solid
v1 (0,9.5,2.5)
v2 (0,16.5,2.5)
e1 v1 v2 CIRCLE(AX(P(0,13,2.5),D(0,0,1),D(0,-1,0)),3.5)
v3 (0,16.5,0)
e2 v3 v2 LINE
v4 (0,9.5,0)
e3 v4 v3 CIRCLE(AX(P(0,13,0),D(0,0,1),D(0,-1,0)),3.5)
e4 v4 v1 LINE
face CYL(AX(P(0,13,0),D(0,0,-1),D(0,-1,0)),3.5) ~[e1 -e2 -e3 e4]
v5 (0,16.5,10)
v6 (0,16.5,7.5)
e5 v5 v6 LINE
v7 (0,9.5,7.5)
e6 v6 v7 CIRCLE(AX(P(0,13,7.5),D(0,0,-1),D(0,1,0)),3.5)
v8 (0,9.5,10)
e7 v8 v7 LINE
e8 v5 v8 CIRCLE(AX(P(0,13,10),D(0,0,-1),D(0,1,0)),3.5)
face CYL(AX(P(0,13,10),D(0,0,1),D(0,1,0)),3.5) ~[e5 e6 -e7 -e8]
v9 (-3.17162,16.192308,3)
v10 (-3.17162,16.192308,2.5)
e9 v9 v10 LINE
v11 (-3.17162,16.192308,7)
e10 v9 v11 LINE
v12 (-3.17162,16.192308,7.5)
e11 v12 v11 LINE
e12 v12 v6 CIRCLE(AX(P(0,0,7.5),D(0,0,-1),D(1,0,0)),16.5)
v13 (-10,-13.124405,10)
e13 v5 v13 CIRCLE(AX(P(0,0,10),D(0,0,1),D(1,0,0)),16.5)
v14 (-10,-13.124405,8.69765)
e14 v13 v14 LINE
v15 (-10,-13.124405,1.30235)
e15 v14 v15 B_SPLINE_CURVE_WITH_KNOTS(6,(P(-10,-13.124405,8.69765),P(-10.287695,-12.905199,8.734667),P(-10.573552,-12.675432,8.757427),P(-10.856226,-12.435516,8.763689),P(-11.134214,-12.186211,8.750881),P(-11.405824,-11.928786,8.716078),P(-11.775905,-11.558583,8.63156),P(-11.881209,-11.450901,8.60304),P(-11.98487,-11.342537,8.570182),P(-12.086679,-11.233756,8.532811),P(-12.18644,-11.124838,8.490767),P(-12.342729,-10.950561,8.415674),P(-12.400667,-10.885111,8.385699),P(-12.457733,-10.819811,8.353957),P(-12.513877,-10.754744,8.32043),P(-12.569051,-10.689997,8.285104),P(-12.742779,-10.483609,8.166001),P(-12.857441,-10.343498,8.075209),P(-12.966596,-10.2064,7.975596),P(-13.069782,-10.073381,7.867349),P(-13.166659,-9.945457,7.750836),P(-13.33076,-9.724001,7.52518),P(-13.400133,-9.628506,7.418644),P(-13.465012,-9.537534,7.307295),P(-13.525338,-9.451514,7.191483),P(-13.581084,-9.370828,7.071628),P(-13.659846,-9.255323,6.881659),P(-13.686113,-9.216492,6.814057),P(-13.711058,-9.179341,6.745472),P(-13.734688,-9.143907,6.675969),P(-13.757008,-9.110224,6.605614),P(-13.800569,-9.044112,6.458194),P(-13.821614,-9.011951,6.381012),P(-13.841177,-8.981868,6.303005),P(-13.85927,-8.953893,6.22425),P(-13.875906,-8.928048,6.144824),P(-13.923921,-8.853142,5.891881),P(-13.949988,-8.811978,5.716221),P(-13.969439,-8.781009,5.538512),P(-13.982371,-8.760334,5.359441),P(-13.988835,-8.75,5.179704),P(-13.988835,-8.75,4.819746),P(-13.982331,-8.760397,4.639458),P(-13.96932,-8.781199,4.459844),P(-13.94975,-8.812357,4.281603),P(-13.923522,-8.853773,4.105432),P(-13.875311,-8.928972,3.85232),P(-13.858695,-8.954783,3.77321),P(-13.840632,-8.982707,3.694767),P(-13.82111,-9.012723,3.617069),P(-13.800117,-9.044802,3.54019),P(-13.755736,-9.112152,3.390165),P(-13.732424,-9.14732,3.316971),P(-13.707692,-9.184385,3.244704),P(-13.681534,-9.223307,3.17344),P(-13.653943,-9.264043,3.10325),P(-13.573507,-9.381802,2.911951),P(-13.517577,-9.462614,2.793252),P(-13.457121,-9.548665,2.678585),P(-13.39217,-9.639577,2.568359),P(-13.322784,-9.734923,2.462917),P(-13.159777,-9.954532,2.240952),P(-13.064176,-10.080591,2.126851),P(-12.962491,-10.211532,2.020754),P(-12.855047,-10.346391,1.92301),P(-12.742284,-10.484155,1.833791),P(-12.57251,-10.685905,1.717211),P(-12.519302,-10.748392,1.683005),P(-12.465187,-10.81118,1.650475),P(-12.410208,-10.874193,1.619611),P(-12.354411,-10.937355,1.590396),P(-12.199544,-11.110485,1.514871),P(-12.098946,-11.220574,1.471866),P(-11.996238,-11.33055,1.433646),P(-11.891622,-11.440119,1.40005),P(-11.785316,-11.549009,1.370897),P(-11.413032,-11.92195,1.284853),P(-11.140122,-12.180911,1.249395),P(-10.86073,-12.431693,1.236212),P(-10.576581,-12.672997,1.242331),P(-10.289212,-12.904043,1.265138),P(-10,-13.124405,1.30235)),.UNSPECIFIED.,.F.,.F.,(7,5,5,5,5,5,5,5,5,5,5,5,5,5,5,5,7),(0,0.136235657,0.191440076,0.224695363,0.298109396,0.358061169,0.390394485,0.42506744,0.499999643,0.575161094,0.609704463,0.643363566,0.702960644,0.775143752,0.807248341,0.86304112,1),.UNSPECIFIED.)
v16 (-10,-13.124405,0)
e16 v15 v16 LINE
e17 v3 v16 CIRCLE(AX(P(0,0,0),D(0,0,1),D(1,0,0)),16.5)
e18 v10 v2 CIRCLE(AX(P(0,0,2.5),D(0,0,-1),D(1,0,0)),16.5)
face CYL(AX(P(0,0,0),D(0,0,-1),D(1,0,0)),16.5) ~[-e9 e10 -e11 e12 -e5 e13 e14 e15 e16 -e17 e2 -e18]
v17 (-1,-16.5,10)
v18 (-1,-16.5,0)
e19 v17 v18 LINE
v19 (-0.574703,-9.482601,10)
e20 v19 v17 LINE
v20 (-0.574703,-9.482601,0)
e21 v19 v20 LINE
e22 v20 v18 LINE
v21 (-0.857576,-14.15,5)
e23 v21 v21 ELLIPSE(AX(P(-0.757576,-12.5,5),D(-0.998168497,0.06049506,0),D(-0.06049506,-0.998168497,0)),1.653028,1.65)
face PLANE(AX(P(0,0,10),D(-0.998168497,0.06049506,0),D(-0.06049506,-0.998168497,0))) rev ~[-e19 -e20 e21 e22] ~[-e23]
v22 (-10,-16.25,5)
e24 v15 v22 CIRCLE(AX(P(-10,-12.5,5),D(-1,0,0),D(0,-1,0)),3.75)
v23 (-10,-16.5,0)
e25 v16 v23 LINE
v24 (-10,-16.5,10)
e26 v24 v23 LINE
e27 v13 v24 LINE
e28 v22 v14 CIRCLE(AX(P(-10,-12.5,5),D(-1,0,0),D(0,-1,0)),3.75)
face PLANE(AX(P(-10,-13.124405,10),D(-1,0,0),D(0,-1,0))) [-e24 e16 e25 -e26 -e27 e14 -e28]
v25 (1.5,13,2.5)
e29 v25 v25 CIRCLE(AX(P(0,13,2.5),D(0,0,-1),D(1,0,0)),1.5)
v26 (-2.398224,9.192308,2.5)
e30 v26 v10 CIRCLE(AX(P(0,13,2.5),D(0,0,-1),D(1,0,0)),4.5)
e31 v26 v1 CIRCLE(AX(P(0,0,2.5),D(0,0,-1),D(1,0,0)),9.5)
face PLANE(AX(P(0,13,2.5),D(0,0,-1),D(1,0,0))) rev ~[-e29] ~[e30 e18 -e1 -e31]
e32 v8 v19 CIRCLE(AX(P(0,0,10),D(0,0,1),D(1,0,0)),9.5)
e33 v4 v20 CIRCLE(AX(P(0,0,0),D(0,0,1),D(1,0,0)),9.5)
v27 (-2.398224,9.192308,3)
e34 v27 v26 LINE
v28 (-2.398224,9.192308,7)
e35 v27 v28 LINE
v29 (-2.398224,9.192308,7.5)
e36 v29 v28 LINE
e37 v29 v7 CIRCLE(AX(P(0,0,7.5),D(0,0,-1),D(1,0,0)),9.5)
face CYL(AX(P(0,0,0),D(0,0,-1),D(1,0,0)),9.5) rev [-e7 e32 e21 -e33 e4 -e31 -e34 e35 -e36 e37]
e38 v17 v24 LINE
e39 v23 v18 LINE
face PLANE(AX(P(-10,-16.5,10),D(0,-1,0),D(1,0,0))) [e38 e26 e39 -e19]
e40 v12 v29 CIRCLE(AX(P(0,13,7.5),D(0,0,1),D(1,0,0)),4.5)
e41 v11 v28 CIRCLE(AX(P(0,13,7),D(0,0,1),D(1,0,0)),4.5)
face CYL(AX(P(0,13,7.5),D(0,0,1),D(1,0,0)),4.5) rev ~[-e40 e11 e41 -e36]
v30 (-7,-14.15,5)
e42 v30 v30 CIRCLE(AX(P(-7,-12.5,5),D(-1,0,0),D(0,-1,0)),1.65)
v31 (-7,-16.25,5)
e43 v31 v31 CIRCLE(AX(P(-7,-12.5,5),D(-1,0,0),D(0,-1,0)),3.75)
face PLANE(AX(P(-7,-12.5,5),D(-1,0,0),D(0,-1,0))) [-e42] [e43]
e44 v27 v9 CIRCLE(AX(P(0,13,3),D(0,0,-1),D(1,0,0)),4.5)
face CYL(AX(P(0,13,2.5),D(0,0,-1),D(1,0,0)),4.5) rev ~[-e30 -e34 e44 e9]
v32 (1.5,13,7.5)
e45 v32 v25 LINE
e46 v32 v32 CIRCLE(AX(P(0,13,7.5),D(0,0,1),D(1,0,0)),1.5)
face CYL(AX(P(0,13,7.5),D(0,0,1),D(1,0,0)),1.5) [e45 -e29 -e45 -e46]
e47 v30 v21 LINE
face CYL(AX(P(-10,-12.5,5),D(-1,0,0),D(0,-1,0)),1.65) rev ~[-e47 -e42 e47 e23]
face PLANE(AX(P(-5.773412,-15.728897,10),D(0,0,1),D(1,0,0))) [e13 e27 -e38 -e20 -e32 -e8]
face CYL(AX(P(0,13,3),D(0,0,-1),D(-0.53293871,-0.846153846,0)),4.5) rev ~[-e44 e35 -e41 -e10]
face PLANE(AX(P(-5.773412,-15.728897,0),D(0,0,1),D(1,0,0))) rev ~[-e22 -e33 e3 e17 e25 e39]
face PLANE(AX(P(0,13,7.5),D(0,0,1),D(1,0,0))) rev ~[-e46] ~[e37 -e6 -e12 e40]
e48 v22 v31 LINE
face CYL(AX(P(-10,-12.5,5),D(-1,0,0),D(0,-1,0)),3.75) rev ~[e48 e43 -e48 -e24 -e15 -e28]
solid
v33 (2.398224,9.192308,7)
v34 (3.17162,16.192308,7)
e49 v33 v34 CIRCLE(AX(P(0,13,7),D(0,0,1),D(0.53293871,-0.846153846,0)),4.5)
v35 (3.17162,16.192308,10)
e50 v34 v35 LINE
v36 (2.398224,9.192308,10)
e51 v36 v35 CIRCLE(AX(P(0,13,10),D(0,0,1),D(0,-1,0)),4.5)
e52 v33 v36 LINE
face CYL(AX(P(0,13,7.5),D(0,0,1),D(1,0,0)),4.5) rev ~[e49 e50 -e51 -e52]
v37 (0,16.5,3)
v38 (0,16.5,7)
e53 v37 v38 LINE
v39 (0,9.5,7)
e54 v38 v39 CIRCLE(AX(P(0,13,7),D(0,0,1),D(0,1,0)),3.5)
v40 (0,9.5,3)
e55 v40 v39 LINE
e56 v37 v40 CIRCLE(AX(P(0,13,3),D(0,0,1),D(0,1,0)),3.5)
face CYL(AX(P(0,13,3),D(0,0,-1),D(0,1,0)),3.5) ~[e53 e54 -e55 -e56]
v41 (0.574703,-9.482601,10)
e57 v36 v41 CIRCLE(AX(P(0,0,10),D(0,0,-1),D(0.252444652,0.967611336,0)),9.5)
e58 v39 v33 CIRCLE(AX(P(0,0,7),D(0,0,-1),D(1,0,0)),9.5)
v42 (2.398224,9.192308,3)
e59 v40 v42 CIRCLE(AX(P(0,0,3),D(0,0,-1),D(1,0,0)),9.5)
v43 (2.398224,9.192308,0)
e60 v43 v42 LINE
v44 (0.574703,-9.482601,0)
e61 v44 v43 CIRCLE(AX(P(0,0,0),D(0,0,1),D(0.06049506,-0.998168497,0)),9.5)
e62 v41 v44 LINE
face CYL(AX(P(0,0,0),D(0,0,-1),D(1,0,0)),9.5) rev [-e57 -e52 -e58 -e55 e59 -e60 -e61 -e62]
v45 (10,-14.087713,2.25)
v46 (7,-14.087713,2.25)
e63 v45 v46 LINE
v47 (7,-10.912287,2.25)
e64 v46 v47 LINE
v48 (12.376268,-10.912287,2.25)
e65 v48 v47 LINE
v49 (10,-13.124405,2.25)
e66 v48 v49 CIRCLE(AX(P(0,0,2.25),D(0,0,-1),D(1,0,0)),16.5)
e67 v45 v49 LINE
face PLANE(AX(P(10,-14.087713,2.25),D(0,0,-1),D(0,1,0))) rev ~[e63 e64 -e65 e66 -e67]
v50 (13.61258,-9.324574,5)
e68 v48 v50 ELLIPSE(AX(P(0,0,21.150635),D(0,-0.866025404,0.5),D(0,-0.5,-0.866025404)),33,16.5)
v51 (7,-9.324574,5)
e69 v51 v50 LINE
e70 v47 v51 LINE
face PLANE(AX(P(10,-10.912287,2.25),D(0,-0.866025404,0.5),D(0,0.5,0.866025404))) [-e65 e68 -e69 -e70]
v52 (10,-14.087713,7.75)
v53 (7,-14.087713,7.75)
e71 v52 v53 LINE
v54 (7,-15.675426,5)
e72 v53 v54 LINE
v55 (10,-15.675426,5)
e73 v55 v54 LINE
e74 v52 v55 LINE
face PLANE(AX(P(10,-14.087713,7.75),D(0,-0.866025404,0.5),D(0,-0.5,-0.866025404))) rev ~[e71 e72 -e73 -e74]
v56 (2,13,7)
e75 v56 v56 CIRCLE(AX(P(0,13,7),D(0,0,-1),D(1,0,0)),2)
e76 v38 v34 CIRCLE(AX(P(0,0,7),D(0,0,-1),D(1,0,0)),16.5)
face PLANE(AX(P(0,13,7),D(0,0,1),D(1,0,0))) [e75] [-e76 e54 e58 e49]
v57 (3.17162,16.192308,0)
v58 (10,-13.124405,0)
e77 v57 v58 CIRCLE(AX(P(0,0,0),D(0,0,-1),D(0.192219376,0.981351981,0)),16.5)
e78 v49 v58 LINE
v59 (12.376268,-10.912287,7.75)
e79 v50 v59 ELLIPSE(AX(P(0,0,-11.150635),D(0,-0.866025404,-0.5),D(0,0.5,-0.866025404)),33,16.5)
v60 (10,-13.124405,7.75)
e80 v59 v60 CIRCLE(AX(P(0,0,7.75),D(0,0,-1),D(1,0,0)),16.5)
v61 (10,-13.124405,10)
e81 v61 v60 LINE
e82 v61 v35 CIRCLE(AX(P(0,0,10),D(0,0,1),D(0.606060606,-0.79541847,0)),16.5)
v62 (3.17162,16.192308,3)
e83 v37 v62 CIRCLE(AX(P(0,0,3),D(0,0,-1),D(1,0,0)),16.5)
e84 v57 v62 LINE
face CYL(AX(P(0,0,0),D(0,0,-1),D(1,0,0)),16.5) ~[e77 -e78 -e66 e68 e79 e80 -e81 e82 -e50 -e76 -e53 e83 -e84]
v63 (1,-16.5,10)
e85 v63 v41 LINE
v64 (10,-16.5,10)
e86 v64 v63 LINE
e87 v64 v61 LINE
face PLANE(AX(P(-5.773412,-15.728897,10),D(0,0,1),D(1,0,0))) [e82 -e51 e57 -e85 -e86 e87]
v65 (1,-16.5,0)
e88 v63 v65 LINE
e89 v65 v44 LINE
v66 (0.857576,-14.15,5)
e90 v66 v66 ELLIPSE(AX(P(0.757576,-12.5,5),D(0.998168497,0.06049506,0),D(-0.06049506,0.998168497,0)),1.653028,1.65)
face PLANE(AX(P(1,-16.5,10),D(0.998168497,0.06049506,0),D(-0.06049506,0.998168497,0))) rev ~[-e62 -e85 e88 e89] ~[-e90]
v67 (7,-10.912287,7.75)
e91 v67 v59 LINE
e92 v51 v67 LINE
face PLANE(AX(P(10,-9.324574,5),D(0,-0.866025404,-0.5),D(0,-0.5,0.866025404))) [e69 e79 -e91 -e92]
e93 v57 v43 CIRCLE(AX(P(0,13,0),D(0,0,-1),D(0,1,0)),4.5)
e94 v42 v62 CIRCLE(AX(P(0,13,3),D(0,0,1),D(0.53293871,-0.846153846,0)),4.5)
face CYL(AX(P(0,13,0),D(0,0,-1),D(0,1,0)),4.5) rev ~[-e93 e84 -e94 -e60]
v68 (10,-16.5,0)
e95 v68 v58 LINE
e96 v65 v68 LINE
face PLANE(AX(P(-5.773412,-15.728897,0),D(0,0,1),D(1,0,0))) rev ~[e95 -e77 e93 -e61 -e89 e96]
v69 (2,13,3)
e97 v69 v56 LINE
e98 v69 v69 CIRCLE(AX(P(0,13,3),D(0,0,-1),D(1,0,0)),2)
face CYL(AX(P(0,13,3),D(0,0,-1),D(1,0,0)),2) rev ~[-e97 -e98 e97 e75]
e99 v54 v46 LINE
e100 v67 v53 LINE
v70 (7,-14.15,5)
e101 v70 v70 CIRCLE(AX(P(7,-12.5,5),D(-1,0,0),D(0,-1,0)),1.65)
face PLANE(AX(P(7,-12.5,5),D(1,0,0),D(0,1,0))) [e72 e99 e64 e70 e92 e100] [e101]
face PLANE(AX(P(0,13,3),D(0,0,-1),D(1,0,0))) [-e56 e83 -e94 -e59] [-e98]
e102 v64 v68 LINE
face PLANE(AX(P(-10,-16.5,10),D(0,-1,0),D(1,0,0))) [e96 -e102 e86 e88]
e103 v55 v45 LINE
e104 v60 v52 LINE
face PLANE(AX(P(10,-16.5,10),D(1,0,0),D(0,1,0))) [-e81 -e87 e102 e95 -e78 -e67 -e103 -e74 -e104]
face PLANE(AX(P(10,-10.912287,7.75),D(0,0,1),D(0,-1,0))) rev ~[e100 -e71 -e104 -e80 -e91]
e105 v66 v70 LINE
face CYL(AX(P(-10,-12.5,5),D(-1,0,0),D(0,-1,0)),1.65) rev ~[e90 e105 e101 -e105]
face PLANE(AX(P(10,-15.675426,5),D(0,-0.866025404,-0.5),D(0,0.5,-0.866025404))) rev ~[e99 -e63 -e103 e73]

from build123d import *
from build123d import SkipClean  # not in build123d's __all__

# Parameters (mm, degrees)
F0_R           = 16.5
F0_R_2         = 9.5
F1_DEPTH       = 10
F3_DEPTH       = 2.5
F4_R           = 4.5
F4_R_2         = 1.5
F5_DEPTH       = 0.5
F7_DEPTH       = 2.5
F8_R           = 4.5
F8_R_2         = 1.5
F9_DEPTH       = 0.5
F10_R          = 2
F10_R_2        = 1.5
F11_DEPTH      = 4
F13_DEPTH      = 10
F15_DEPTH      = 10.001
F16_R          = 1.65
F17_DEPTH      = 20
F19_DEPTH      = 3
F19_DEPTH_BACK = 10
F20_R          = 3.75
F21_DEPTH      = 3
F21_DEPTH_BACK = 25


# Not quite as in the source:
# - after a boolean that leaves OpenCascade's solid faulty, fix() repairs it
# - a feature names something its author has since deleted; it is built from what else it names


with BuildPart() as f1:
    # F0 (on Top) → F1 (new body)
    with BuildSketch(Plane.XY):
        Circle(F0_R)
        Circle(F0_R_2, mode=Mode.SUBTRACT)
    extrude(amount=F1_DEPTH)

    # F2 (on face) → F3 (cut)
    with BuildSketch(Plane.XY.offset(10)):
        with BuildLine():
            ThreePointArc((0, 16.5), (3.5, 13), (0, 9.5))
            Line((0, 9.5), (0, 8.5))
            ThreePointArc((0, 8.5), (4.5, 13), (0, 17.5))
            Line((0, 17.5), (0, 16.5))
        make_face()
    extrude(amount=-F3_DEPTH, mode=Mode.SUBTRACT)

    # F4 (on face) → F5 (cut)
    with BuildSketch(Plane.XY.offset(7.5)):
        with Locations((0, 13)):
            Circle(F4_R)
        with Locations((0, 13)):
            Circle(F4_R_2, mode=Mode.SUBTRACT)
    extrude(amount=-F5_DEPTH, mode=Mode.SUBTRACT)

    # F6 (on face) → F7 (cut)
    with BuildSketch(Plane(origin=(0, 0, 0), x_dir=(1, 0, 0), z_dir=(0, 0, -1))):
        with BuildLine():
            ThreePointArc((0, -9.5), (3.5, -13), (0, -16.5))
            Line((0, -16.5), (0, -17.5))
            ThreePointArc((0, -17.5), (4.5, -13), (0, -8.5))
            Line((0, -8.5), (0, -9.5))
        make_face()
    extrude(amount=-F7_DEPTH, mode=Mode.SUBTRACT)

    # F8 (on face) → F9 (cut)
    with BuildSketch(Plane(origin=(0, 0, 2.5), x_dir=(1, 0, 0), z_dir=(0, 0, -1))):
        with Locations((0, -13)):
            Circle(F8_R)
        with Locations((0, -13)):
            Circle(F8_R_2, mode=Mode.SUBTRACT)
    extrude(amount=-F9_DEPTH, mode=Mode.SUBTRACT)

    # F10 (on face) → F11 (cut, through all)
    with BuildSketch(Plane(origin=(0, 0, 3), x_dir=(1, 0, 0), z_dir=(0, 0, -1))):
        with BuildLine():
            ThreePointArc((0, -16.5), (-3.5, -13), (0, -9.5))
            ThreePointArc((0, -9.5), (-1.2089410497, -9.4227629461), (-2.3982241951, -9.1923076923))
            ThreePointArc((-2.3982241951, -9.1923076923), (-4.472783282, -12.5058242088), (-3.171619712, -16.1923076923))
            ThreePointArc((-3.171619712, -16.1923076923), (-1.5932550136, -16.4228967744), (0, -16.5))
        make_face()
        with Locations((0, -13)):
            Circle(F10_R)
        with Locations((0, -13)):
            Circle(F10_R_2, mode=Mode.SUBTRACT)
    with SkipClean():  # cleaning this boolean's faces spoils the solid; the shape is the same uncleaned
        extrude(amount=-F11_DEPTH, mode=Mode.SUBTRACT)

    # F12 (on face) → F13 (join, through all)
    with BuildSketch(Plane.XY.offset(10)):
        with BuildLine():
            Line((-10, -13.1244047484), (-10, -16.5))
            Line((-10, -16.5), (0, -16.5))
            ThreePointArc((0, -16.5), (-5.2771830389, -15.6333406275), (-10, -13.1244047484))
        make_face()
        with BuildLine():
            ThreePointArc((10, -13.1244047484), (5.2771830389, -15.6333406275), (0, -16.5))
            Line((0, -16.5), (10, -16.5))
            Line((10, -16.5), (10, -13.1244047484))
        make_face()
    extrude(amount=-F13_DEPTH)

    add(f1.part.fix(), mode=Mode.REPLACE)

    # F14 (on face) → F15 (cut, through all)
    with BuildSketch(Plane.XY.offset(10)):
        Polygon((1, -16.5), (0, 0), (-1, -16.5), align=None)
    extrude(amount=-F15_DEPTH, mode=Mode.SUBTRACT)

    # F16 (on face) → F17 (cut, through all)
    with BuildSketch(Plane(origin=(-10, 0, 0), x_dir=(0, -1, 0), z_dir=(-1, 0, 0))):
        with Locations((12.5, 5)):
            Circle(F16_R)
    extrude(amount=-F17_DEPTH, mode=Mode.SUBTRACT)

    # F18 (on face) → F19 (cut, two sides)
    with BuildSketch(Plane.YZ.offset(10)) as f19_sk:
        Polygon((-10.9122867597, 2.25), (-9.3245735195, 5), (-10.9122867597, 7.75), (-14.0877132403, 7.75), (-15.6754264805, 5), (-14.0877132403, 2.25), align=None)
    extrude(amount=-F19_DEPTH, mode=Mode.SUBTRACT)
    extrude(f19_sk.sketch, amount=F19_DEPTH_BACK, mode=Mode.SUBTRACT)

    # F20 (on face) → F21 (cut, two sides)
    with BuildSketch(Plane(origin=(-10, 0, 0), x_dir=(0, -1, 0), z_dir=(-1, 0, 0))) as f21_sk:
        with Locations((12.5, 5)):
            Circle(F20_R)
    extrude(amount=-F21_DEPTH, mode=Mode.SUBTRACT)
    extrude(f21_sk.sketch, amount=F21_DEPTH_BACK, mode=Mode.SUBTRACT)


solid = f1.part
